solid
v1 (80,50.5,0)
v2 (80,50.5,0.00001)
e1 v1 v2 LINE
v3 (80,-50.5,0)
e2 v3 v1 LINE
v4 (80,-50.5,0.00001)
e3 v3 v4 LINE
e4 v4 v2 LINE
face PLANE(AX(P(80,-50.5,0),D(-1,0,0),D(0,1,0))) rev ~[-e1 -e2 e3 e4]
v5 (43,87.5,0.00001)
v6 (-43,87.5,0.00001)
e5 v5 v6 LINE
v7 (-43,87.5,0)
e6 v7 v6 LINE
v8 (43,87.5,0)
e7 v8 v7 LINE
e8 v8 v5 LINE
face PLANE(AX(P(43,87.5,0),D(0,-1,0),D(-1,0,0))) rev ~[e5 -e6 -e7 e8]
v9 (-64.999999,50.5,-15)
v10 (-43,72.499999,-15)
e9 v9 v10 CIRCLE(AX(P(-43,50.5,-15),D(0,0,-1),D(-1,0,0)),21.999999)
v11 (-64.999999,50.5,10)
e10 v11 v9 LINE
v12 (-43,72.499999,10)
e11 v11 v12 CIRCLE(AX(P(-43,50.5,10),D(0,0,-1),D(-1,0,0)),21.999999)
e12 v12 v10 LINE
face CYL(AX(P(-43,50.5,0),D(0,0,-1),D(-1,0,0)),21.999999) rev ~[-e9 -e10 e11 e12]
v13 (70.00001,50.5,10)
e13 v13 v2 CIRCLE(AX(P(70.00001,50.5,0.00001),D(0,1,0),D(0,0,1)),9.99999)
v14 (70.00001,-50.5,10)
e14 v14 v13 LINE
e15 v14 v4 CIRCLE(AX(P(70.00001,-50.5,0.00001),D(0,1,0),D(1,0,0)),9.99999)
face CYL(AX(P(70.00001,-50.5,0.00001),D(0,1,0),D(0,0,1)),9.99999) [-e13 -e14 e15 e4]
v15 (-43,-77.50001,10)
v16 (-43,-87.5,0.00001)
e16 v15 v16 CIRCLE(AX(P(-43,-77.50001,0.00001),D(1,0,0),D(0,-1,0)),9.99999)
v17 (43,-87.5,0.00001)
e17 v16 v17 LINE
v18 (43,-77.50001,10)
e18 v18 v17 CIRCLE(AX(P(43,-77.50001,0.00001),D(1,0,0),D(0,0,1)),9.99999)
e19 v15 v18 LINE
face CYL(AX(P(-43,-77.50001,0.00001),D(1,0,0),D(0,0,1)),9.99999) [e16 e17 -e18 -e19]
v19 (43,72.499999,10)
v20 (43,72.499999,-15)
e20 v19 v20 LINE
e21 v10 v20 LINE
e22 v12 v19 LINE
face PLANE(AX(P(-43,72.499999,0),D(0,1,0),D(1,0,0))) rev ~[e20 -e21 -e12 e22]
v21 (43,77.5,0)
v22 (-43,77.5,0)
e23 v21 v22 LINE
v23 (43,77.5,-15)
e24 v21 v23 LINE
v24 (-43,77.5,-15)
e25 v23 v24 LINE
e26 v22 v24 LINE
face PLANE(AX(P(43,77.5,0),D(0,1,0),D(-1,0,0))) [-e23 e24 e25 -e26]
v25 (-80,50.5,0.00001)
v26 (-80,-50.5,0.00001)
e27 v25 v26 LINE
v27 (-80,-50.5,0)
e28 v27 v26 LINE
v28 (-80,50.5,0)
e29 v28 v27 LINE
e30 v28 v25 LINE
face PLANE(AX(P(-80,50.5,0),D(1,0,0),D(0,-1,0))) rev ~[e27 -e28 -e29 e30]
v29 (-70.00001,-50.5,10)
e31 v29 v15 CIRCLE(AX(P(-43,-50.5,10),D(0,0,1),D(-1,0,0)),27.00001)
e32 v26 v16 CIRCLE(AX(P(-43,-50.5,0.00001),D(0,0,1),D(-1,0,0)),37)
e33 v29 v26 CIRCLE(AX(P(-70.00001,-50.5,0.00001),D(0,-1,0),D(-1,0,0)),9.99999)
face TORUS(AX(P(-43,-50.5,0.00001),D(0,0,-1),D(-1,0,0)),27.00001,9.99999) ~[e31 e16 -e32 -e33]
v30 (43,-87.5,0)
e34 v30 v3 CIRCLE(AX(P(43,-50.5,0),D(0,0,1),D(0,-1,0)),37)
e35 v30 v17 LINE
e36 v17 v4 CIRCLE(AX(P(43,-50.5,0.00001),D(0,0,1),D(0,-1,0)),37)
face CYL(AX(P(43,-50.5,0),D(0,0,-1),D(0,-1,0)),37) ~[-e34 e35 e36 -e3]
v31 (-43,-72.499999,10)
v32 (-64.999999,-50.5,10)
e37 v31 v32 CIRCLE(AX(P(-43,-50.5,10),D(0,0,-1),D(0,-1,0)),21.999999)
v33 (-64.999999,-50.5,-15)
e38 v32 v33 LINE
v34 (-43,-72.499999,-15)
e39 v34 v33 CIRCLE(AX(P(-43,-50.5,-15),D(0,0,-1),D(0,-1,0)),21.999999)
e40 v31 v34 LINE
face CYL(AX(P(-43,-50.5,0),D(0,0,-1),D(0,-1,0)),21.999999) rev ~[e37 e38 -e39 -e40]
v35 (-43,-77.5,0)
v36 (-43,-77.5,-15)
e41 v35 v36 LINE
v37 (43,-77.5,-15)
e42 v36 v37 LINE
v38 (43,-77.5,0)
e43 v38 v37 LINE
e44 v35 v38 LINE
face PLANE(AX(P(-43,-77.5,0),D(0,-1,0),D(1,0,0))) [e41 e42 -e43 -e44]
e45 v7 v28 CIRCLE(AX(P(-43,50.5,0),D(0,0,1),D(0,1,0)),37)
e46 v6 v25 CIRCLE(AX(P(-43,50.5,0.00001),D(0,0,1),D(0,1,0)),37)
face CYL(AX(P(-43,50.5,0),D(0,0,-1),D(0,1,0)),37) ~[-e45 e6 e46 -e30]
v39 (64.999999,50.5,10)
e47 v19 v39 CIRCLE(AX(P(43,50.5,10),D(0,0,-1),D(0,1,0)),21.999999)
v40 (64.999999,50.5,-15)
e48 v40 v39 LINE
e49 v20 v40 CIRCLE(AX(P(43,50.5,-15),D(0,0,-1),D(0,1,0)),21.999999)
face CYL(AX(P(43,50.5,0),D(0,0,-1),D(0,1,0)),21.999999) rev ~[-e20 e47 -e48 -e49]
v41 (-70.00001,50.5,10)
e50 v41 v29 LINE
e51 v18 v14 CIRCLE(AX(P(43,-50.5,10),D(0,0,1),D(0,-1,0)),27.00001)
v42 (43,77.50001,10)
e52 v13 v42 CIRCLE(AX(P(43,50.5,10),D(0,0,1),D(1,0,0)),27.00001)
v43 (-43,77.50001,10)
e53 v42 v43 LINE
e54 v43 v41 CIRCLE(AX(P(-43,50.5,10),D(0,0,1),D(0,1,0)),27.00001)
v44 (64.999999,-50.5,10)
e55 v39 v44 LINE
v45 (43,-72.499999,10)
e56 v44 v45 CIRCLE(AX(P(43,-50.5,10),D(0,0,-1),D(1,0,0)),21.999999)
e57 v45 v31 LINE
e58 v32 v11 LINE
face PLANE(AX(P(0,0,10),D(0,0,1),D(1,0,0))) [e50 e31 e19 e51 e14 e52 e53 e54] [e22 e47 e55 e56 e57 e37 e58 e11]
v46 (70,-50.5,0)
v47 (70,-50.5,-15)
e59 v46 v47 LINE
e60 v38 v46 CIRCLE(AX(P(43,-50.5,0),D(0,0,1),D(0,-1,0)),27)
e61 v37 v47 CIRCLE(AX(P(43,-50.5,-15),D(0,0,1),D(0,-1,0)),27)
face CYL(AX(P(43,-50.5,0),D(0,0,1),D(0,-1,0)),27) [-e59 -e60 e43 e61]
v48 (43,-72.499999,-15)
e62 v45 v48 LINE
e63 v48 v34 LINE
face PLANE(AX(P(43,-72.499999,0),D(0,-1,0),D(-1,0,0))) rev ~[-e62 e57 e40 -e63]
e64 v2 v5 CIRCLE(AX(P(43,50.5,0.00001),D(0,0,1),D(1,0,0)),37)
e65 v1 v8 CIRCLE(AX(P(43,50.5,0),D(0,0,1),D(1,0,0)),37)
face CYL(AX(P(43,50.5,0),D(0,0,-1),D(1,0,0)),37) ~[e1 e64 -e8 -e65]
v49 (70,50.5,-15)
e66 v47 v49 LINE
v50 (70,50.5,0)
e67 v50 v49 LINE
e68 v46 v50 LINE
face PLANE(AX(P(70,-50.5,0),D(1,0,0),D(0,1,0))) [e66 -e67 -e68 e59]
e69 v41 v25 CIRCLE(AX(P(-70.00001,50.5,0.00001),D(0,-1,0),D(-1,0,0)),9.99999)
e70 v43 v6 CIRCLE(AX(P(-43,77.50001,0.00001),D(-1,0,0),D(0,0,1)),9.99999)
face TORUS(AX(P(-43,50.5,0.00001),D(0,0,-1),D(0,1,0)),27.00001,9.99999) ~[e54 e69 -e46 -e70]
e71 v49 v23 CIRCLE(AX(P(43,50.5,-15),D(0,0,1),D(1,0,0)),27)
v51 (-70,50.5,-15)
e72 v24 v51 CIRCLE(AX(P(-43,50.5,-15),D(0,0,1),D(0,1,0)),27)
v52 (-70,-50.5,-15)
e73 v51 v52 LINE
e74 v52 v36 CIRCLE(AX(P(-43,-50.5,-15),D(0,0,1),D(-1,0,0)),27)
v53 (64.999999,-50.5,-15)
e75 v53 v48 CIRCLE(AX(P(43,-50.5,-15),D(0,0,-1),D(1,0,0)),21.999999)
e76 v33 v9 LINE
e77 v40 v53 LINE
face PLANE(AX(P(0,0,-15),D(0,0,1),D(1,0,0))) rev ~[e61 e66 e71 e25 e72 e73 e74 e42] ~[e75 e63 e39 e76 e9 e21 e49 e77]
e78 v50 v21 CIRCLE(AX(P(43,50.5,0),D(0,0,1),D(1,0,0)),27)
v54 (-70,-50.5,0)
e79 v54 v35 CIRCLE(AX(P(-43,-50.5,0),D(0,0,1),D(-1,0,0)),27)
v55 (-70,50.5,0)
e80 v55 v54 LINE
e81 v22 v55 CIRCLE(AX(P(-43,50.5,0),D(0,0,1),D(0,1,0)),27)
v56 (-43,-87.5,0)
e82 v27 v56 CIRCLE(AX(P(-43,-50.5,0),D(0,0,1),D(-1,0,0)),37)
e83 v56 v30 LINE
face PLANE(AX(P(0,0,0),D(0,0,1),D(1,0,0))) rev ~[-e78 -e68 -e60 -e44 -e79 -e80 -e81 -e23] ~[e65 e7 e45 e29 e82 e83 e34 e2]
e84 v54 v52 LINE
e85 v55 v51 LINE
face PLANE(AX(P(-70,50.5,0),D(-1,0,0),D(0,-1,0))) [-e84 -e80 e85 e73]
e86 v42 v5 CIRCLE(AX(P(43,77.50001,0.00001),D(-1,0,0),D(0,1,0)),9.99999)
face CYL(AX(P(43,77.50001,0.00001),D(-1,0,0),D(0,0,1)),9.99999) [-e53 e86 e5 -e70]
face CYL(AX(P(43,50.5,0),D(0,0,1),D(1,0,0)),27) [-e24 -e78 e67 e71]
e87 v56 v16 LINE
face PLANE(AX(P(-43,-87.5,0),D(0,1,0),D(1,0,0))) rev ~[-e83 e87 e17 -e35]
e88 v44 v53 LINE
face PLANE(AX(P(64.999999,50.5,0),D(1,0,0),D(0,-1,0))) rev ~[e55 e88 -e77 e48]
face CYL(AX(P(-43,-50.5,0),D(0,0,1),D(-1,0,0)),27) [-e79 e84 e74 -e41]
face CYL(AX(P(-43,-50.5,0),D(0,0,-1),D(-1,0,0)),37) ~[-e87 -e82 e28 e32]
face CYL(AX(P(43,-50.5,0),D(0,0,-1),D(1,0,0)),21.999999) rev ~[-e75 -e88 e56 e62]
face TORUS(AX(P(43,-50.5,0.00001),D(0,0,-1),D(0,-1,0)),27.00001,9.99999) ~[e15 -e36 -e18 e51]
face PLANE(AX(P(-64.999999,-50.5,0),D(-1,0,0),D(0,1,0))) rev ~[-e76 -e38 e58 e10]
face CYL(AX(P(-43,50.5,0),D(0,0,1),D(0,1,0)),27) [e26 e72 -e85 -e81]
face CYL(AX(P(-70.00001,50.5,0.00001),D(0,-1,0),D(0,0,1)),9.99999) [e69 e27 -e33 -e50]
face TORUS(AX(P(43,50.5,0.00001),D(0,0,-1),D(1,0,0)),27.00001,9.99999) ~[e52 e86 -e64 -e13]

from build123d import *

# Parameters (mm, degrees)
F1_DEPTH = 15
F2_DEPTH = 10
F3_R     = 9.99999


# Not quite as in the source:
# - a fillet or chamfer is up to 0.001 mm smaller than in the source, because OpenCascade refuses the exact size
# - a feature of the source that left no trace in its solid (it failed there, or was rolled back) is left out


with BuildPart() as f1:
    # F0 (on Top) → F1 (new body)
    with BuildSketch(Plane.XY):
        with BuildLine():
            Line((-43, -77.5), (43, -77.5))
            ThreePointArc((43, -77.5), (62.091883092, -69.591883092), (70, -50.5))
            Line((70, -50.5), (70, 50.5))
            ThreePointArc((70, 50.5), (62.091883092, 69.591883092), (43, 77.5))
            Line((43, 77.5), (-43, 77.5))
            ThreePointArc((-43, 77.5), (-62.091883092, 69.591883092), (-70, 50.5))
            Line((-70, 50.5), (-70, -50.5))
            ThreePointArc((-70, -50.5), (-62.091883092, -69.591883092), (-43, -77.5))
        make_face()
        with BuildLine():
            Line((64.9999988648, 50.5), (64.9999988648, -50.5))
            ThreePointArc((64.9999988648, -50.5), (58.5563483834, -66.0563483834), (43, -72.4999988648))
            Line((43, -72.4999988648), (-43, -72.4999988648))
            ThreePointArc((-43, -72.4999988648), (-58.5563483834, -66.0563483834), (-64.9999988648, -50.5))
            Line((-64.9999988648, -50.5), (-64.9999988648, 50.5))
            ThreePointArc((-64.9999988648, 50.5), (-58.5563483834, 66.0563483834), (-43, 72.4999988648))
            Line((-43, 72.4999988648), (43, 72.4999988648))
            ThreePointArc((43, 72.4999988648), (58.5563483834, 66.0563483834), (64.9999988648, 50.5))
        make_face(mode=Mode.SUBTRACT)
    extrude(amount=-F1_DEPTH)

    # F0 (on Top) → F2 (join)
    with BuildSketch(Plane.XY):
        with BuildLine():
            Line((80, -50.5), (80, 50.5))
            ThreePointArc((80, 50.5), (69.1629509039, 76.6629509039), (43, 87.5))
            Line((43, 87.5), (-43, 87.5))
            ThreePointArc((-43, 87.5), (-69.1629509039, 76.6629509039), (-80, 50.5))
            Line((-80, 50.5), (-80, -50.5))
            ThreePointArc((-80, -50.5), (-69.1629509039, -76.6629509039), (-43, -87.5))
            Line((-43, -87.5), (43, -87.5))
            ThreePointArc((43, -87.5), (69.1629509039, -76.6629509039), (80, -50.5))
        make_face()
        with BuildLine():
            ThreePointArc((70, -50.5), (62.091883092, -69.591883092), (43, -77.5))
            Line((43, -77.5), (-43, -77.5))
            ThreePointArc((-43, -77.5), (-62.091883092, -69.591883092), (-70, -50.5))
            Line((-70, -50.5), (-70, 50.5))
            ThreePointArc((-70, 50.5), (-62.091883092, 69.591883092), (-43, 77.5))
            Line((-43, 77.5), (43, 77.5))
            ThreePointArc((43, 77.5), (62.091883092, 69.591883092), (70, 50.5))
            Line((70, 50.5), (70, -50.5))
        make_face(mode=Mode.SUBTRACT)
        with BuildLine():
            Line((-43, -77.5), (43, -77.5))
            ThreePointArc((43, -77.5), (62.091883092, -69.591883092), (70, -50.5))
            Line((70, -50.5), (70, 50.5))
            ThreePointArc((70, 50.5), (62.091883092, 69.591883092), (43, 77.5))
            Line((43, 77.5), (-43, 77.5))
            ThreePointArc((-43, 77.5), (-62.091883092, 69.591883092), (-70, 50.5))
            Line((-70, 50.5), (-70, -50.5))
            ThreePointArc((-70, -50.5), (-62.091883092, -69.591883092), (-43, -77.5))
        make_face()
        with BuildLine():
            Line((64.9999988648, 50.5), (64.9999988648, -50.5))
            ThreePointArc((64.9999988648, -50.5), (58.5563483834, -66.0563483834), (43, -72.4999988648))
            Line((43, -72.4999988648), (-43, -72.4999988648))
            ThreePointArc((-43, -72.4999988648), (-58.5563483834, -66.0563483834), (-64.9999988648, -50.5))
            Line((-64.9999988648, -50.5), (-64.9999988648, 50.5))
            ThreePointArc((-64.9999988648, 50.5), (-58.5563483834, 66.0563483834), (-43, 72.4999988648))
            Line((-43, 72.4999988648), (43, 72.4999988648))
            ThreePointArc((43, 72.4999988648), (58.5563483834, 66.0563483834), (64.9999988648, 50.5))
        make_face(mode=Mode.SUBTRACT)
    extrude(amount=F2_DEPTH)

    # F3 (radius 10 in the source; OpenCascade refuses exactly that, so slightly less here)
    f3_edges = [f1.edges().sort_by_distance(p)[0] for p in [
        (-69.162951, -76.662951, 10),
        (80, 0, 10),
        (69.162951, 76.662951, 10),
        (0, 87.5, 10),
        (-69.162951, 76.662951, 10),
        (-80, 0, 10),
        (0, -87.5, 10),
        (69.162951, -76.662951, 10),
    ]]
    fillet(f3_edges, radius=F3_R)


solid = f1.part
